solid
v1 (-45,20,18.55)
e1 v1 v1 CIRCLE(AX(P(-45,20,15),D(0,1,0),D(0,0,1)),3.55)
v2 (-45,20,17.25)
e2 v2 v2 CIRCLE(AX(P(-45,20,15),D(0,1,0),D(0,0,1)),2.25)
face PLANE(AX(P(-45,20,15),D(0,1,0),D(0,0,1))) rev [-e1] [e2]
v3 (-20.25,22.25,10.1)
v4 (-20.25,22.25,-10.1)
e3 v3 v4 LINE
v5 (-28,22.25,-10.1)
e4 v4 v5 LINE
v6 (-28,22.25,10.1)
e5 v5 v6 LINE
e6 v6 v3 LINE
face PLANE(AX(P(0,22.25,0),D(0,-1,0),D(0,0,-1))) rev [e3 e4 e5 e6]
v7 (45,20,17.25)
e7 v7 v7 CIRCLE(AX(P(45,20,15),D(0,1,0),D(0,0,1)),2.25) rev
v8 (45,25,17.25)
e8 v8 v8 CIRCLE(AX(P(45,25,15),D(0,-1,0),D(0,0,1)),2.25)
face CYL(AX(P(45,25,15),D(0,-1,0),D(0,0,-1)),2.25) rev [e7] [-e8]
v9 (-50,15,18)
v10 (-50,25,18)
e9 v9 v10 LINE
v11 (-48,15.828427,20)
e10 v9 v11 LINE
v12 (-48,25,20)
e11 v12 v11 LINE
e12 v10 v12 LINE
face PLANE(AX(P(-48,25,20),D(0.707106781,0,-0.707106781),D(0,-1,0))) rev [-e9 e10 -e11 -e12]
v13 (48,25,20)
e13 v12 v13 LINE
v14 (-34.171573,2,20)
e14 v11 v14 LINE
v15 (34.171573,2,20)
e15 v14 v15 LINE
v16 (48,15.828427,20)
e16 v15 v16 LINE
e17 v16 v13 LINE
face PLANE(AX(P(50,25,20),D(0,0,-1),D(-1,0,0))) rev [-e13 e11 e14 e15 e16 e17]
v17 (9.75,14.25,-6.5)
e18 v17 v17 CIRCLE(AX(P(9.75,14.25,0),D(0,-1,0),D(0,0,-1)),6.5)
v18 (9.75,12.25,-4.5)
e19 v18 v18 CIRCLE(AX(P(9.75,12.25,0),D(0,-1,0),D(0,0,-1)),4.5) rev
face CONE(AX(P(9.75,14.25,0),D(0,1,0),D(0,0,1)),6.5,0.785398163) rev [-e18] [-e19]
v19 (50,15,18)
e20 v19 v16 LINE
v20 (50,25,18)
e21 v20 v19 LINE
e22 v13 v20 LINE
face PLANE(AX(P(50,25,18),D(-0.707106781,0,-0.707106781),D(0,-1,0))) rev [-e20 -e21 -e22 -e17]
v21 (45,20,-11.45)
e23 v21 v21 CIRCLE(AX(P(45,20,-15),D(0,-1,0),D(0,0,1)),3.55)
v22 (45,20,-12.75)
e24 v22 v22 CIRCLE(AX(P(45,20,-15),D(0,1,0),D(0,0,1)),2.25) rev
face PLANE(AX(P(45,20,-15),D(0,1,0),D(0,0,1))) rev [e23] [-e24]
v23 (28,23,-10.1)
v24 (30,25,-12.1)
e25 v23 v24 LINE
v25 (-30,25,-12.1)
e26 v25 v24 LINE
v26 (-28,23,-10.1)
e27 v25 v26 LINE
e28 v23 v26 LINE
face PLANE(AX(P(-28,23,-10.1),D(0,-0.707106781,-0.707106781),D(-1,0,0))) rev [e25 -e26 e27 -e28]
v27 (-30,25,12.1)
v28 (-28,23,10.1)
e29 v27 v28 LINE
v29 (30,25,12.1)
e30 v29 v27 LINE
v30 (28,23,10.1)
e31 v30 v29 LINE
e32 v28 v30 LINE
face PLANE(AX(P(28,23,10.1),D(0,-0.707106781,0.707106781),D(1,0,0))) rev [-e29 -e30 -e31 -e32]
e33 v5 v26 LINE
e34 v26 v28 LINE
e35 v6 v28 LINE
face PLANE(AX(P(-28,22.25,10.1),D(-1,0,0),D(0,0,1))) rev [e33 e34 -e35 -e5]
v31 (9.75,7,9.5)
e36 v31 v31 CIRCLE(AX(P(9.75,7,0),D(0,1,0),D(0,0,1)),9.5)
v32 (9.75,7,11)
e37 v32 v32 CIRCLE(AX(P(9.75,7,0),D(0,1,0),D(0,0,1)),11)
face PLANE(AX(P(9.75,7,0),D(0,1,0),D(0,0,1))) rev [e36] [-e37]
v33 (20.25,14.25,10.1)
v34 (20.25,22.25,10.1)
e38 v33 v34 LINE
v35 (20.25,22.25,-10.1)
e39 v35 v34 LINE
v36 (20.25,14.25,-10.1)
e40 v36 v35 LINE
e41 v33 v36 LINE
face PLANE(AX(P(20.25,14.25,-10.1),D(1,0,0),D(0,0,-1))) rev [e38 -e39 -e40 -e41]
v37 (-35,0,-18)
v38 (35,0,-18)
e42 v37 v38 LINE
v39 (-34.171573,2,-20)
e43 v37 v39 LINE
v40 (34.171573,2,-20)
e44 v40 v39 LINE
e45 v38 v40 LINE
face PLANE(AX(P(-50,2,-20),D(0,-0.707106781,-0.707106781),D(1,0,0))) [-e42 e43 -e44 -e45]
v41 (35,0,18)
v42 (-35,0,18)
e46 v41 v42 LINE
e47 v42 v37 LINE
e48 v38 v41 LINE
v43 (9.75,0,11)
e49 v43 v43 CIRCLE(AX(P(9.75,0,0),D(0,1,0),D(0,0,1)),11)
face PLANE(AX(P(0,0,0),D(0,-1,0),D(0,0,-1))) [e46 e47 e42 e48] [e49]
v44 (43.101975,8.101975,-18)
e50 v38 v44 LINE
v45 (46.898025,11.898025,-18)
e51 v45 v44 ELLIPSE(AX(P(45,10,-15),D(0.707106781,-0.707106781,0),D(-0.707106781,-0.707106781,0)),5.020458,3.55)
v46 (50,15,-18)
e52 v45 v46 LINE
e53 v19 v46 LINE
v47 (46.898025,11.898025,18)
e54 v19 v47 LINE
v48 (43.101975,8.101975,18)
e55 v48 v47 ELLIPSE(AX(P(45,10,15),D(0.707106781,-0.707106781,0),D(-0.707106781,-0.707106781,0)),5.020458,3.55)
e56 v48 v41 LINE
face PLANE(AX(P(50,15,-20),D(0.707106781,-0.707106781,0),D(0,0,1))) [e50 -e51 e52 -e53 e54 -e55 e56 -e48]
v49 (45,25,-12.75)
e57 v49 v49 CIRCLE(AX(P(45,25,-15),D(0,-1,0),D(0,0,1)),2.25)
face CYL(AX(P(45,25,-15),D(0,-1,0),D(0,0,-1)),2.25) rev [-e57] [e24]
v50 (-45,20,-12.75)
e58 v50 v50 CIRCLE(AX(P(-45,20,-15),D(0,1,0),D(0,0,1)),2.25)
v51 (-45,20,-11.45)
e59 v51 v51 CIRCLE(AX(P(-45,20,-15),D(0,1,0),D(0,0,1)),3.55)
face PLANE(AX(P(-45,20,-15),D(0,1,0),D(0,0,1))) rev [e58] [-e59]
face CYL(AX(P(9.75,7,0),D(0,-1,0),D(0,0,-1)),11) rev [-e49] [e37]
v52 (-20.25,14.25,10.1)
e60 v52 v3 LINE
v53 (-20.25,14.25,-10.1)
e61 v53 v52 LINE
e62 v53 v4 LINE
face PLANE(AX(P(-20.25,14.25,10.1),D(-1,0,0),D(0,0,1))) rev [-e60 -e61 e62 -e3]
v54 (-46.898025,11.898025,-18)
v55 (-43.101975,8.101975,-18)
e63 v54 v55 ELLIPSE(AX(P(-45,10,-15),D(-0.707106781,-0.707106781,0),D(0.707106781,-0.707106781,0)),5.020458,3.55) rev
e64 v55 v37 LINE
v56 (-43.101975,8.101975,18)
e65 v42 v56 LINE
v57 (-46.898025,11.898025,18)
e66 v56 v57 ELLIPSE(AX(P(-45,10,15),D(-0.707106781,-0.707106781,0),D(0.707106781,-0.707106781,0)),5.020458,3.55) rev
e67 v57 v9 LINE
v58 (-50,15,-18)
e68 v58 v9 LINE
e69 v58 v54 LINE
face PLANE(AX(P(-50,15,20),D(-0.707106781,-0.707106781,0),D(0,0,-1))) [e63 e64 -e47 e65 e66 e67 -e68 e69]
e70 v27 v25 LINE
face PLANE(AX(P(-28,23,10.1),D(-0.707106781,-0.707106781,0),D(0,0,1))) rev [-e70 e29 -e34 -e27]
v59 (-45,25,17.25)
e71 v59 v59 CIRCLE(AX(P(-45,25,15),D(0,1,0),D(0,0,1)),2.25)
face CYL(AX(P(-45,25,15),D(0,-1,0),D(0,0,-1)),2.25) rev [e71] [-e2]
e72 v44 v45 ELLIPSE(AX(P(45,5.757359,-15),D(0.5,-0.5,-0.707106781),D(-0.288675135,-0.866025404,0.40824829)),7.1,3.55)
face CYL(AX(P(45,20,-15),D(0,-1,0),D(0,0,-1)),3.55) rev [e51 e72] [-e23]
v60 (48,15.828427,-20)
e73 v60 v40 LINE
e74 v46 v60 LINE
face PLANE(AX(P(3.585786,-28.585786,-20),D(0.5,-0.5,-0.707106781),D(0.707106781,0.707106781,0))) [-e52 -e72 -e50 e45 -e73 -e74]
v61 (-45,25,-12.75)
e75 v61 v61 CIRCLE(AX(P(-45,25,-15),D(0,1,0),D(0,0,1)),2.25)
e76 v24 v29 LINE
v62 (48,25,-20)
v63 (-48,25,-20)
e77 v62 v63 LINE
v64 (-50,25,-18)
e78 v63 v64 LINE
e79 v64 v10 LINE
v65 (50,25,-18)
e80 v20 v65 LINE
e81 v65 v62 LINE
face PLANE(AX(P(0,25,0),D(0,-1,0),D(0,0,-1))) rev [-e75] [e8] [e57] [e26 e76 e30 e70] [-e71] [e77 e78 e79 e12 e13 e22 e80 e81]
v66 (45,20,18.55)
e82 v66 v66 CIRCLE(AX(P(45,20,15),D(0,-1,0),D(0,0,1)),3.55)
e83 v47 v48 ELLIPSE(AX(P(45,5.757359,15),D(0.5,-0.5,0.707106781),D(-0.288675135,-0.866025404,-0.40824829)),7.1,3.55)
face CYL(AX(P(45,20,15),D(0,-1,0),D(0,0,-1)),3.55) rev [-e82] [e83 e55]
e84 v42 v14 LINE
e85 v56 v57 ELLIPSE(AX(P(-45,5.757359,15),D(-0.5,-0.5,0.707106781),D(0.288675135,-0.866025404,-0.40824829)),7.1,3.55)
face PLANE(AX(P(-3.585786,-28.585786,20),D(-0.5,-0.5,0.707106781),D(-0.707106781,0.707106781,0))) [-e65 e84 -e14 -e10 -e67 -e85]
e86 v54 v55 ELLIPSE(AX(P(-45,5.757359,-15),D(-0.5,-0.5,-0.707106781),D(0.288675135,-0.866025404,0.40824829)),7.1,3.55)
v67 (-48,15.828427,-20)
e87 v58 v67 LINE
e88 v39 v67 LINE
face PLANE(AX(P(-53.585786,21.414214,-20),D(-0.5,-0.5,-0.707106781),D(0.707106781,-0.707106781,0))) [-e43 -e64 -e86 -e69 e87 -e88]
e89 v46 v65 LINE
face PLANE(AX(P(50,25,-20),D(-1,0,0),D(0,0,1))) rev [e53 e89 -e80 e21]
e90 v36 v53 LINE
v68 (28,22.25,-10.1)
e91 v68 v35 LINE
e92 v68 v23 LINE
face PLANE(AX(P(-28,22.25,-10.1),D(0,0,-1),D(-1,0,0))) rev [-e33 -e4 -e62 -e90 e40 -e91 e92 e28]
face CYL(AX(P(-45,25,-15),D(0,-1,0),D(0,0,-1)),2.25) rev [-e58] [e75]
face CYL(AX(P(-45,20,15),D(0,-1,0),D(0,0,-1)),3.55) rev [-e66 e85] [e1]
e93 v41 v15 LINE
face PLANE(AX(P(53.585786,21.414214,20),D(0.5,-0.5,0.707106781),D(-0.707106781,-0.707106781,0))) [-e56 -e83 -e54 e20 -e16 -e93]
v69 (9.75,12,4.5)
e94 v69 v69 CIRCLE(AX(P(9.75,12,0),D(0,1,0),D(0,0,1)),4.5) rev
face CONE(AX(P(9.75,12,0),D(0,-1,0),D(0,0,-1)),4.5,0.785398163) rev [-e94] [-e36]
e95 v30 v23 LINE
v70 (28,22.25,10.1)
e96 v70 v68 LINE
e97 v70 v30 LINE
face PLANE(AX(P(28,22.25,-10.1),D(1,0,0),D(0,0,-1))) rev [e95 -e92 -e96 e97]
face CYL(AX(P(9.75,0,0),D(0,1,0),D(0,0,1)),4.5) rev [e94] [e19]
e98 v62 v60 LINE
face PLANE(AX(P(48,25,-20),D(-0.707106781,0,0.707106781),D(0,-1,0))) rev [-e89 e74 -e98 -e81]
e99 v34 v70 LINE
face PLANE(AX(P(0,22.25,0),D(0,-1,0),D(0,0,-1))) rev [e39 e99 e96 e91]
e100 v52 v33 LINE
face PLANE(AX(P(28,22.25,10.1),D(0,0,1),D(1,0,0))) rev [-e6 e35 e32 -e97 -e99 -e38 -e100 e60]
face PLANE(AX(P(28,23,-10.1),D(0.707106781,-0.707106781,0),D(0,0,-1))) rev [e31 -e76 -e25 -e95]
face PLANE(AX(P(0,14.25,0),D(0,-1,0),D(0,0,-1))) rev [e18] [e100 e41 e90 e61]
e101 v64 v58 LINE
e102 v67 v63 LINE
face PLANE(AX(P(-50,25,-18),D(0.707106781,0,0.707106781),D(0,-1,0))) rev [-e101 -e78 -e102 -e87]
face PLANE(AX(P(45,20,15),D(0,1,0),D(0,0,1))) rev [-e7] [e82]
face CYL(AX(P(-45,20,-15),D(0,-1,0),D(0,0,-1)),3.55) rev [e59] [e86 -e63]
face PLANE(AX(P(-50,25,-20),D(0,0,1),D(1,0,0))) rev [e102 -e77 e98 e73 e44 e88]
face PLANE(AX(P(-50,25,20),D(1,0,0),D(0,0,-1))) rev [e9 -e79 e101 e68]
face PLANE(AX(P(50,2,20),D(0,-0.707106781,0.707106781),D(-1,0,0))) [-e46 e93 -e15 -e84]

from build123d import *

# Parameters (mm, degrees)
SKETCH1_W           = 100
SKETCH1_H           = 40
BOSS_EXTRUDE1_DEPTH = 25
SKETCH2_R           = 2.25
CUT_EXTRUDE1_DEPTH  = 25
SKETCH3_R           = 3.55
CUT_EXTRUDE2_DEPTH  = 20
SKETCH4_W           = 56
SKETCH4_H           = 20.2
CUT_EXTRUDE3_DEPTH  = 2.75
SKETCH5_W           = 40.5
SKETCH5_H           = 20.2
CUT_EXTRUDE4_DEPTH  = 10.75
SKETCH6_R           = 4.5
CUT_EXTRUDE5_DEPTH  = 60.371710435
SKETCH7_R           = 11
CUT_EXTRUDE6_DEPTH  = 7
CHAMFER1_SIZE       = 5
CHAMFER2_SIZE       = 15
CHAMFER3_SIZE       = 2
CHAMFER4_SIZE       = 2
CHAMFER5_SIZE       = 2


with BuildPart() as part:
    # Sketch1 → Boss-Extrude1 (new body)
    with BuildSketch(Plane(origin=(0, 0, 0), x_dir=(1, 0, 0), z_dir=(0, 1, 0))):
        Rectangle(SKETCH1_W, SKETCH1_H)
    extrude(amount=BOSS_EXTRUDE1_DEPTH)

    # Sketch2 → Cut-Extrude1 (cut)
    with BuildSketch(Plane(origin=(0, 0, 0), x_dir=(1, 0, 0), z_dir=(0, 1, 0))):
        with Locations(Location((-45, -15, 0), (0, 0, 270))):
            Circle(SKETCH2_R)
        with Locations(Location((-45, 15, 0), (0, 0, 270))):
            Circle(SKETCH2_R)
    cut_extrude1 = extrude(amount=CUT_EXTRUDE1_DEPTH, mode=Mode.SUBTRACT)

    # Mirror1: Cut-Extrude1 across plane
    add(cut_extrude1.mirror(Plane(origin=(0, 0, 0), x_dir=(0, 0, 1), z_dir=(1, 0, 0))), mode=Mode.SUBTRACT)

    # Sketch3 → Cut-Extrude2 (cut)
    with BuildSketch(Plane(origin=(0, 0, 0), x_dir=(1, 0, 0), z_dir=(0, 1, 0))):
        with Locations(Location((-45, 15, 0), (0, 0, 270))):
            Circle(SKETCH3_R)
        with Locations(Location((-45, -15, 0), (0, 0, 270))):
            Circle(SKETCH3_R)
    cut_extrude2 = extrude(amount=CUT_EXTRUDE2_DEPTH, mode=Mode.SUBTRACT)

    # Mirror2: Cut-Extrude2 across plane
    add(cut_extrude2.mirror(Plane(origin=(0, 0, 0), x_dir=(0, 0, 1), z_dir=(1, 0, 0))), mode=Mode.SUBTRACT)

    # Sketch4 → Cut-Extrude3 (cut)
    with BuildSketch(Plane(origin=(0, 25, 0), x_dir=(1, 0, 0), z_dir=(0, 1, 0))):
        Rectangle(SKETCH4_W, SKETCH4_H)
    extrude(amount=-CUT_EXTRUDE3_DEPTH, mode=Mode.SUBTRACT)

    # Sketch5 → Cut-Extrude4 (cut)
    with BuildSketch(Plane(origin=(0, 25, 0), x_dir=(1, 0, 0), z_dir=(0, 1, 0))):
        Rectangle(SKETCH5_W, SKETCH5_H)
    extrude(amount=-CUT_EXTRUDE4_DEPTH, mode=Mode.SUBTRACT)

    # Sketch6 → Cut-Extrude5 (cut, through all)
    with BuildSketch(Plane(origin=(0, 25, 0), x_dir=(1, 0, 0), z_dir=(0, 1, 0))):
        with Locations(Location((9.75, 0, 0), (0, 0, 270))):
            Circle(SKETCH6_R)
    extrude(amount=-CUT_EXTRUDE5_DEPTH, mode=Mode.SUBTRACT)

    # Sketch7 → Cut-Extrude6 (cut)
    with BuildSketch(Plane(origin=(0, 0, 0), x_dir=(1, 0, 0), z_dir=(0, 1, 0))):
        with Locations(Location((9.75, 0, 0), (0, 0, 270))):
            Circle(SKETCH7_R)
    extrude(amount=CUT_EXTRUDE6_DEPTH, mode=Mode.SUBTRACT)

    # Chamfer1
    chamfer1_edges = [part.edges().sort_by_distance(p)[0] for p in [
        (9.75, 7, -4.5),
    ]]
    chamfer(chamfer1_edges, length=CHAMFER1_SIZE)

    # Chamfer2
    # the kernel refuses this chamfer: 15 mm, written as the material it takes off along each edge
    with BuildSketch(Plane(origin=(50, 0, -58.575244819), x_dir=(-0.9996219169112968, -0.02749587661058637, 0), z_dir=(0, 0, 1)), Plane(origin=(-50, 0, 58.575244819), x_dir=(0.9996219169112968, -0.02749587661058637, 0), z_dir=(0, 0, -1))) as chamfer2_piece_1:
        Polygon((CHAMFER2_SIZE * 0.999621916911, -CHAMFER2_SIZE * 0.0274958766106), (-CHAMFER2_SIZE * 0.0274958766106, -CHAMFER2_SIZE * 0.999621916911), (0, 0), align=None)
    extrude(amount=117.150489639, mode=Mode.SUBTRACT)

    # Chamfer3
    # the kernel refuses this chamfer: 2 mm, written as the material it takes off along each edge
    with BuildSketch(Plane(origin=(50, 9.856634024, -20), x_dir=(-0.9996219169112968, 0, -0.027495876610585647), z_dir=(0, 1, 0)), Plane(origin=(-50, 9.856634024, 20), x_dir=(0.9996219169112968, 0, 0.027495876610585647), z_dir=(0, 1, 0))) as chamfer3_piece_1:
        Polygon((CHAMFER3_SIZE * 0.999621916911, CHAMFER3_SIZE * 0.0274958766106), (-CHAMFER3_SIZE * 0.0274958766106, CHAMFER3_SIZE * 0.999621916911), (0, 0), align=None)
    extrude(amount=20.286731952, mode=Mode.SUBTRACT)
    with BuildSketch(Plane(origin=(31.36309104, -3.63690896, -20), x_dir=(0.01944252080602223, -0.01944252080600668, 0.9996219169112968), z_dir=(0.7071067811862648, 0.7071067811868302, 0))) as chamfer3_piece_2:
        Polygon((CHAMFER3_SIZE * 0.999621916911, -CHAMFER3_SIZE * 0.0274958766106), (-CHAMFER3_SIZE * 0.0274958766106, -CHAMFER3_SIZE * 0.999621916911), (0, 0), align=None)
    extrude(amount=31.499935387, mode=Mode.SUBTRACT)
    with BuildSketch(Plane(origin=(-40.143365976, 0, -20), x_dir=(0, -0.02749587661058639, 0.9996219169112968), z_dir=(1, 0, 0)), Plane(origin=(40.143365976, 0, 20), x_dir=(0, -0.02749587661058639, -0.9996219169112968), z_dir=(-1, 0, 0))) as chamfer3_piece_3:
        Polygon((CHAMFER3_SIZE * 0.999621916911, -CHAMFER3_SIZE * 0.0274958766106), (-CHAMFER3_SIZE * 0.0274958766106, -CHAMFER3_SIZE * 0.999621916911), (0, 0), align=None)
    extrude(amount=80.286731952, mode=Mode.SUBTRACT)
    with BuildSketch(Plane(origin=(-53.63690896, 18.63690896, -20), x_dir=(0.706839436070956, 0.7068394360703909, -0.02749587661058563), z_dir=(0.7071067811862648, -0.7071067811868302, 0)), Plane(origin=(-31.36309104, -3.63690896, 20), x_dir=(0.7068394360709562, 0.7068394360703909, 0.027495876610585616), z_dir=(-0.7071067811862648, 0.7071067811868302, 0)), Plane(origin=(53.63690896, 18.63690896, 20), x_dir=(-0.706839436070956, 0.7068394360703909, 0.02749587661058563), z_dir=(-0.7071067811862648, -0.7071067811868302, 0))) as chamfer3_piece_4:
        Polygon((CHAMFER3_SIZE * 0.999621916911, CHAMFER3_SIZE * 0.0274958766106), (-CHAMFER3_SIZE * 0.0274958766106, CHAMFER3_SIZE * 0.999621916911), (0, 0), align=None)
    extrude(amount=31.499935387, mode=Mode.SUBTRACT)
    with BuildSketch(Plane(origin=(-50, 9.856634024, -20), x_dir=(0.9996219169112968, 0, -0.027495876610585647), z_dir=(0, 1, 0)), Plane(origin=(50, 9.856634024, 20), x_dir=(-0.9996219169112968, 0, 0.027495876610585647), z_dir=(0, 1, 0))) as chamfer3_piece_5:
        Polygon((CHAMFER3_SIZE * 0.999621916911, -CHAMFER3_SIZE * 0.0274958766106), (-CHAMFER3_SIZE * 0.0274958766106, -CHAMFER3_SIZE * 0.999621916911), (0, 0), align=None)
    extrude(amount=20.286731952, mode=Mode.SUBTRACT)

    # Chamfer4
    chamfer4_edges = [part.edges().sort_by_distance(p)[0] for p in [
        (9.75, 14.25, -4.5),
    ]]
    chamfer(chamfer4_edges, length=CHAMFER4_SIZE)

    # Chamfer5
    chamfer5_edges = [part.edges().sort_by_distance(p)[0] for p in [
        (0, 25, -10.1),
        (-28, 25, 0),
        (0, 25, 10.1),
        (28, 25, 0),
    ]]
    chamfer(chamfer5_edges, length=CHAMFER5_SIZE)


solid = part.part
